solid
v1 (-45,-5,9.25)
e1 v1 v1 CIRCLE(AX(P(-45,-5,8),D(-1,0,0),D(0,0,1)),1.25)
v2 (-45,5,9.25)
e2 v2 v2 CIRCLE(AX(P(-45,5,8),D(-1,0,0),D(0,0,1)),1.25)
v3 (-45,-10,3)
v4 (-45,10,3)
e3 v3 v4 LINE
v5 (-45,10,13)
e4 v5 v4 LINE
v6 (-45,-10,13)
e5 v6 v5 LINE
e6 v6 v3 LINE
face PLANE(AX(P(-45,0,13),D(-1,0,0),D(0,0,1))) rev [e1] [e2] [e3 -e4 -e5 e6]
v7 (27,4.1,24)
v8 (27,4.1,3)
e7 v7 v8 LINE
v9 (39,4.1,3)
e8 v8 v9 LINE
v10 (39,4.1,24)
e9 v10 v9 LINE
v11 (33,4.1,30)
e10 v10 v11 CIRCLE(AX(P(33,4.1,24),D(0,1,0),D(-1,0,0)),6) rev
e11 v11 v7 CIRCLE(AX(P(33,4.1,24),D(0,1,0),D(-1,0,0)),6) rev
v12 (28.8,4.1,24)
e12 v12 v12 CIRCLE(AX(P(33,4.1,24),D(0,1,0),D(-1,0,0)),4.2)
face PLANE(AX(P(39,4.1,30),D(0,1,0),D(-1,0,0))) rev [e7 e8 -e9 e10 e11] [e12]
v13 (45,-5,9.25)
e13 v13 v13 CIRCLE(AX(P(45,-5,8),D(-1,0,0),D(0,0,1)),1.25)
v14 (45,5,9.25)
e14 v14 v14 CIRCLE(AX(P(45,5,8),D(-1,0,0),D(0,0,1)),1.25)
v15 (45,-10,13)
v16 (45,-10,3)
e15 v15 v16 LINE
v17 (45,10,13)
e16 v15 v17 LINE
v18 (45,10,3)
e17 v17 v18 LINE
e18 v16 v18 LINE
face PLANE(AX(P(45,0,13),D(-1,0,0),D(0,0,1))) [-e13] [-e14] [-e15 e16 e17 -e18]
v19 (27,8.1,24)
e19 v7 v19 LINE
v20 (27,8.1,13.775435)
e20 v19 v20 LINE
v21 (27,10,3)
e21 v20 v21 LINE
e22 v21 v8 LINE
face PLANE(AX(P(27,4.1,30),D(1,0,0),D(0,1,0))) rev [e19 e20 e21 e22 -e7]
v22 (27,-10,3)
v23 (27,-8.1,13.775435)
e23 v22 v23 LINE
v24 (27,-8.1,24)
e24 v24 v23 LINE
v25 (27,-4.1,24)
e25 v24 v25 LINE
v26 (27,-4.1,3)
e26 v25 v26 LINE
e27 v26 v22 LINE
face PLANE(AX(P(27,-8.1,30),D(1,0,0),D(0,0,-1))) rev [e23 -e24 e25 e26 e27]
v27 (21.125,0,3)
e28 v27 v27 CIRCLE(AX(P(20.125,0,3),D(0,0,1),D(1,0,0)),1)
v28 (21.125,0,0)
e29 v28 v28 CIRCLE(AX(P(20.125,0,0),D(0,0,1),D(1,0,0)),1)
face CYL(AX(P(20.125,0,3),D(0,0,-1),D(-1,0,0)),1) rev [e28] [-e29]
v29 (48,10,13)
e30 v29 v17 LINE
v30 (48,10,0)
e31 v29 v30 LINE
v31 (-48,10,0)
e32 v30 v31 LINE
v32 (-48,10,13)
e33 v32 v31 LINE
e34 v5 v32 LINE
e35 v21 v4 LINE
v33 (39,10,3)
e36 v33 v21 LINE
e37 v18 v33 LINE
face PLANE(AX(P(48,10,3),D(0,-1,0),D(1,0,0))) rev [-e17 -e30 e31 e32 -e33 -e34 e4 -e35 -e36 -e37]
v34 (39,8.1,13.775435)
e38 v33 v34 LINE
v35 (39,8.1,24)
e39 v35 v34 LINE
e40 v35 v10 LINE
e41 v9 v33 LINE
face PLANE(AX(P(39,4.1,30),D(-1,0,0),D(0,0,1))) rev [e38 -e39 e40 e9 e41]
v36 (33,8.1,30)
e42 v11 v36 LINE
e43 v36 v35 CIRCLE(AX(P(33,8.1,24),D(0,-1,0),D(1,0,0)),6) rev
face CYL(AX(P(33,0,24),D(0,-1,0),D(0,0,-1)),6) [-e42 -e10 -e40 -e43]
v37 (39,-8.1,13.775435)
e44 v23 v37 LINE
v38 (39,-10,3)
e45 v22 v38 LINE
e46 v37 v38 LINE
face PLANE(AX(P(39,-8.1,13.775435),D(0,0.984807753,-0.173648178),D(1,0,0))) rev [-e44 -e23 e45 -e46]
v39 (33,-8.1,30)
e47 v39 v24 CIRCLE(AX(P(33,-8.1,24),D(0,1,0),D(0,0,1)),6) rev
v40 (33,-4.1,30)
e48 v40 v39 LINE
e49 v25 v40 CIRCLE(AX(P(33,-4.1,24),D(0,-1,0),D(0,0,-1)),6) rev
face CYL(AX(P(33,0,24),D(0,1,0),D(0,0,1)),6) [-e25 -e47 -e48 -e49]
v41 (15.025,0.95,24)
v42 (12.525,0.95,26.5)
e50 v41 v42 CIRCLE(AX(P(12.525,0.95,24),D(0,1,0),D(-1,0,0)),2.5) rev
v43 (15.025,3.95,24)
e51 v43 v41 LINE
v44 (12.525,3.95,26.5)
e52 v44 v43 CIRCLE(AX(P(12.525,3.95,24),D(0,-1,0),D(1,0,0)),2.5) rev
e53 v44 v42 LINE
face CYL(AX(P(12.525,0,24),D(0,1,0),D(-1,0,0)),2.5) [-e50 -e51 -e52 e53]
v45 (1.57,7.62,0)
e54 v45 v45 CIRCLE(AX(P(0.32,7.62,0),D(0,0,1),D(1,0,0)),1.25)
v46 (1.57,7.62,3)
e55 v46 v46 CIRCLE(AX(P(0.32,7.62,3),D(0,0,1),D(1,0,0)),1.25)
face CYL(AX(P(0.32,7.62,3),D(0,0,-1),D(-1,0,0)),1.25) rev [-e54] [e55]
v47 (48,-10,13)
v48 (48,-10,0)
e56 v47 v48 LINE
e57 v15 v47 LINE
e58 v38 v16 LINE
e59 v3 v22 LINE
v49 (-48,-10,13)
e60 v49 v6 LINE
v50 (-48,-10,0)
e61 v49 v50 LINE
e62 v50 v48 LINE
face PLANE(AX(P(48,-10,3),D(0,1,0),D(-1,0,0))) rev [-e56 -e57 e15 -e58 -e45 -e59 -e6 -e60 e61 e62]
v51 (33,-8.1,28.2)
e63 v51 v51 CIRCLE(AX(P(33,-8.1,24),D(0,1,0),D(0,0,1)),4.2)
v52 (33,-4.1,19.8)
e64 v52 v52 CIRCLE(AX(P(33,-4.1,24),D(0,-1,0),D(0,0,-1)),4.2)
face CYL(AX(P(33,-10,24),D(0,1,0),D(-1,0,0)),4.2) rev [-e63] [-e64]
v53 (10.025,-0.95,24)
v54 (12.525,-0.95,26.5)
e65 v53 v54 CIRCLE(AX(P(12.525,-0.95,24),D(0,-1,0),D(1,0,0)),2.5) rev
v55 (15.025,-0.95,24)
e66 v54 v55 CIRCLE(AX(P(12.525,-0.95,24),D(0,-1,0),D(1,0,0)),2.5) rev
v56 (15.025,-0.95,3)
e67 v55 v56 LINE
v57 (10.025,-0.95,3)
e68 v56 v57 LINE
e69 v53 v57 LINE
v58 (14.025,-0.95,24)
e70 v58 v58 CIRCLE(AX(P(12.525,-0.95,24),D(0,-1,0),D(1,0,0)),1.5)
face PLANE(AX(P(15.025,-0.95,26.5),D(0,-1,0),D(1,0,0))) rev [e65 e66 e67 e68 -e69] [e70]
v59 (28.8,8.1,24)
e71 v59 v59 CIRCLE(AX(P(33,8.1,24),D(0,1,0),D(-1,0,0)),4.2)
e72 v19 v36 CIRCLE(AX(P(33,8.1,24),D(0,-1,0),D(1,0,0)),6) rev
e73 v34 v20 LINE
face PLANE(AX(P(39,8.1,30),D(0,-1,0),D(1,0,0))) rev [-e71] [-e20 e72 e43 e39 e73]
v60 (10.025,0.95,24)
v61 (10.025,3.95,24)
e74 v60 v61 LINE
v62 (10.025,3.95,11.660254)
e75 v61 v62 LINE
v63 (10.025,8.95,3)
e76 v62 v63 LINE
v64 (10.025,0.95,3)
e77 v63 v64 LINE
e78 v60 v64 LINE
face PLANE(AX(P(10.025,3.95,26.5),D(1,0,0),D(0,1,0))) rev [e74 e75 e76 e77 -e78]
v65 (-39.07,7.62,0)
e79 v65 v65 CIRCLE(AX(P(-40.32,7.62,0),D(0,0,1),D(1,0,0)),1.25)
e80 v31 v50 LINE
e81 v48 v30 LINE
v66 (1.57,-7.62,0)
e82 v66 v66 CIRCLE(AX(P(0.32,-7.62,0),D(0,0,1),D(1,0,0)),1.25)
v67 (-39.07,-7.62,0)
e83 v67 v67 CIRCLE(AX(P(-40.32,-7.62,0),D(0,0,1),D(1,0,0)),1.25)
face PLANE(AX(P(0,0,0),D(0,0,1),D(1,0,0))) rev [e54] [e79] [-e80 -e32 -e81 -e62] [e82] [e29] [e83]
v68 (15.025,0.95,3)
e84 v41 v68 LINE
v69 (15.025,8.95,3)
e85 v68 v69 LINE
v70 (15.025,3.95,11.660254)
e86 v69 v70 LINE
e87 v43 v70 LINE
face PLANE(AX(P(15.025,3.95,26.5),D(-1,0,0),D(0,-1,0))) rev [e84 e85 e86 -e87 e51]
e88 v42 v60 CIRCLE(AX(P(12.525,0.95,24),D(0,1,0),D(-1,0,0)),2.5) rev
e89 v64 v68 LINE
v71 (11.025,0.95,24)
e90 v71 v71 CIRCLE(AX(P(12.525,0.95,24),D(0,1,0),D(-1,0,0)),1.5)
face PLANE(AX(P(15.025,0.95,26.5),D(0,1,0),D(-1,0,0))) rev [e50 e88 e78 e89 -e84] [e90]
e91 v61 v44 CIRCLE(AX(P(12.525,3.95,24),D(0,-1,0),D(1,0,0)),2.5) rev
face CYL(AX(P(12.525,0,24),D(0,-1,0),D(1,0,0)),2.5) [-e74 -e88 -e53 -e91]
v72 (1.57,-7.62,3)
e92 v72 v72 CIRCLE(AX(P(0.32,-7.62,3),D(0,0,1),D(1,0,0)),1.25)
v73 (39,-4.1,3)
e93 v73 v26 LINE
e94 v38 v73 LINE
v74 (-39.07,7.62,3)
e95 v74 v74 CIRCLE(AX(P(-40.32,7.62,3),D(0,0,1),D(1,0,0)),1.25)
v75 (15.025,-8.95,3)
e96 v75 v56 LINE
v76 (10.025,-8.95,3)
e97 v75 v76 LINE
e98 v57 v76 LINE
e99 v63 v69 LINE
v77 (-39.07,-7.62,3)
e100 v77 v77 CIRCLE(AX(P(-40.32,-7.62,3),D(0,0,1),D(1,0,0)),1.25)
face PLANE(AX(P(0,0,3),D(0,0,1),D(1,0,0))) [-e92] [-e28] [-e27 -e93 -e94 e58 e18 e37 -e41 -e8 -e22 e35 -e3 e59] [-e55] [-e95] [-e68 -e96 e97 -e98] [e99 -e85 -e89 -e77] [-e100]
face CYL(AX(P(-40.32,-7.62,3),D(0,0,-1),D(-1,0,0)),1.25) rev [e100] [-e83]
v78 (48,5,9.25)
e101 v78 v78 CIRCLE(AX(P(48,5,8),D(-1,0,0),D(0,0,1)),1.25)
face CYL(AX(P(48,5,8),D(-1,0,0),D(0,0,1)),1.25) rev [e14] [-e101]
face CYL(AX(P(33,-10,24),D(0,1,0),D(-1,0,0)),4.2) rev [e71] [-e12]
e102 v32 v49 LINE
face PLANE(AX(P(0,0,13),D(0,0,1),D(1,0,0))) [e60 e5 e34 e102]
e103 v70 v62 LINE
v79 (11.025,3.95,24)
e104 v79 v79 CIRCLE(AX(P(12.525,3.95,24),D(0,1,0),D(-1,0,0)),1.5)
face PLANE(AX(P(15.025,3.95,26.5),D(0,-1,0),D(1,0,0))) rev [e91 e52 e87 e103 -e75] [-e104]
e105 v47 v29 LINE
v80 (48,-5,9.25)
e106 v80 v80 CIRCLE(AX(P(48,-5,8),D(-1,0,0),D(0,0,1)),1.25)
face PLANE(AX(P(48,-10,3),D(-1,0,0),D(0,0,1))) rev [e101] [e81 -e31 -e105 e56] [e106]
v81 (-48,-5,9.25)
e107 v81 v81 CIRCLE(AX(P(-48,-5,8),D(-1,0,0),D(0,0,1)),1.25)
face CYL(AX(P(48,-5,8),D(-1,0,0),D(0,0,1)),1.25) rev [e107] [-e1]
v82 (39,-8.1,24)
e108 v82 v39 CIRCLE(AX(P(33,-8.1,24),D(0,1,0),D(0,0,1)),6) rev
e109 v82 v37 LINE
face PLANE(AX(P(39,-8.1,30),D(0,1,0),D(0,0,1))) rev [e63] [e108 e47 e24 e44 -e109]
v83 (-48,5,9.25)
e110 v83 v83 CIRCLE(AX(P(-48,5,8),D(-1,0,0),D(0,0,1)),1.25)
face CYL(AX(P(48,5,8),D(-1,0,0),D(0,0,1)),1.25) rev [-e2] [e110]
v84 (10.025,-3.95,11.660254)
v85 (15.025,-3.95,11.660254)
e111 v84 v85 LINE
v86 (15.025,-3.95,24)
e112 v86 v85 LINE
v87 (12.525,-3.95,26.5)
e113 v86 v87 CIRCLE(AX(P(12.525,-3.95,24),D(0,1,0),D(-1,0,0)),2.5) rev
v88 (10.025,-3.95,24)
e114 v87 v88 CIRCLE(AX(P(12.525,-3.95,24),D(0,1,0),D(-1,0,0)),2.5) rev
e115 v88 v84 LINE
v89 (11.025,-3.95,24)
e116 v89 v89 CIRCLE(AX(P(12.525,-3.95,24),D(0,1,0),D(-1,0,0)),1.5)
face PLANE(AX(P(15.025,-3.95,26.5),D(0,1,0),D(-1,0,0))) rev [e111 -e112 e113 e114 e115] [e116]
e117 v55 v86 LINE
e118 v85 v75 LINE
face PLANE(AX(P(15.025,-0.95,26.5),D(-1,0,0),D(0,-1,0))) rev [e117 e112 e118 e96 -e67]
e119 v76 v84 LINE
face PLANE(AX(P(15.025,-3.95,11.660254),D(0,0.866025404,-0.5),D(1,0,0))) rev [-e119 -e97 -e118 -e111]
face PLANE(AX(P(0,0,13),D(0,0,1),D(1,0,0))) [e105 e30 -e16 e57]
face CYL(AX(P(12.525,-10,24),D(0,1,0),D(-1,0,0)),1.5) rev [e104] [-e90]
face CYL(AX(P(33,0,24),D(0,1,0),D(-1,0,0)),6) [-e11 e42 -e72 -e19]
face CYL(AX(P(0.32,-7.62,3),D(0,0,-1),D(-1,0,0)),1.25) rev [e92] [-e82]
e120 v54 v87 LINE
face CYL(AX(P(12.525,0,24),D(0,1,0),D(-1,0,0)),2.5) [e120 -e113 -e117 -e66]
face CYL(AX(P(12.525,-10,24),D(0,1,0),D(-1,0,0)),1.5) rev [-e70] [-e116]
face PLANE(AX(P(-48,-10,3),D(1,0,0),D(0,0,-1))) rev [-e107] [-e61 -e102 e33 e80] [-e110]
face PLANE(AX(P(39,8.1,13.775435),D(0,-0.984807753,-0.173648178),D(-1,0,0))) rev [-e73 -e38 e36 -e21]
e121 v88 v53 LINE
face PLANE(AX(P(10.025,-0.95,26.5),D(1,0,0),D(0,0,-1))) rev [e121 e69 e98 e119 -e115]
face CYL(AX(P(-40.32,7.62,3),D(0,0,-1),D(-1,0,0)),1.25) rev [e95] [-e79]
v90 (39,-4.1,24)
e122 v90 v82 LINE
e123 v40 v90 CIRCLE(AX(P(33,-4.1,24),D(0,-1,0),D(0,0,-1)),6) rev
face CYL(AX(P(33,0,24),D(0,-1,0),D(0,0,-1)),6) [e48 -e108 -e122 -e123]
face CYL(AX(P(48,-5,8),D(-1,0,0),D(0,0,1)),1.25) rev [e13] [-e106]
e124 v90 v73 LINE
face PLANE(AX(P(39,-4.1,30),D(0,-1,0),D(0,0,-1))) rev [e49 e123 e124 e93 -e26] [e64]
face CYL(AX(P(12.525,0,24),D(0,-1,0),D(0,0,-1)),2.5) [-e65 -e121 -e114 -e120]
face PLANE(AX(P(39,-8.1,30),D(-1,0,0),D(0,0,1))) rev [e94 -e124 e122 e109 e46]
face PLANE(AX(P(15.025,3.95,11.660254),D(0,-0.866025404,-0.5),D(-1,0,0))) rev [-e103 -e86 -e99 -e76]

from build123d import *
from OCP.BRepFilletAPI import BRepFilletAPI_MakeChamfer

# Parameters (mm, degrees)
SCHIZZO1_W                   = 96
SCHIZZO1_H                   = 20
SCHIZZO1_R                   = 1
SCHIZZO1_R_2                 = 1.25
ESTRUSIONE_ESTRUSIONE1_DEPTH = 3
SCHIZZO2_W                   = 3
SCHIZZO2_H                   = 20
ESTRUSIONE_ESTRUSIONE2_DEPTH = 10
SCHIZZO3_R                   = 1.25
TAGLIO_ESTRUSIONE1_DEPTH     = 98.390964673
SCHIZZO4_W                   = 12
SCHIZZO4_H                   = 4
ESTRUSIONE_ESTRUSIONE3_DEPTH = 27
RACCORDO1_R                  = 6
SCHIZZO5_R                   = 4.2
TAGLIO_ESTRUSIONE2_DEPTH     = 60.427350606
SMUSSO1_SIZE                 = 10.775435457
SMUSSO1_SIZE_2               = 1.9
SCHIZZO6_W                   = 5
SCHIZZO6_H                   = 3
ESTRUSIONE_ESTRUSIONE4_DEPTH = 23.5
RACCORDO2_R                  = 2.5
SCHIZZO7_R                   = 1.5
TAGLIO_ESTRUSIONE3_DEPTH     = 59.297534253
SMUSSO2_SIZE                 = 5
SMUSSO2_SIZE2                = 8.660254038


with BuildPart() as part:
    # Schizzo1 → Estrusione-Estrusione1 (new body)
    with BuildSketch(Plane.XY):
        Rectangle(SCHIZZO1_W, SCHIZZO1_H)
        with Locations((20.125, 0)):
            Circle(SCHIZZO1_R, mode=Mode.SUBTRACT)
        with Locations((-40.32, 7.62)):
            Circle(SCHIZZO1_R_2, mode=Mode.SUBTRACT)
        with Locations((0.32, 7.62)):
            Circle(SCHIZZO1_R_2, mode=Mode.SUBTRACT)
        with Locations((0.32, -7.62)):
            Circle(SCHIZZO1_R_2, mode=Mode.SUBTRACT)
        with Locations((-40.32, -7.62)):
            Circle(SCHIZZO1_R_2, mode=Mode.SUBTRACT)
    extrude(amount=ESTRUSIONE_ESTRUSIONE1_DEPTH)

    # Schizzo2 → Estrusione-Estrusione2 (add)
    with BuildSketch(Plane.XY.offset(3)):
        with Locations((-46.5, 0)):
            Rectangle(SCHIZZO2_W, SCHIZZO2_H)
        with Locations((46.5, 0)):
            Rectangle(SCHIZZO2_W, SCHIZZO2_H)
    extrude(amount=ESTRUSIONE_ESTRUSIONE2_DEPTH)

    # Schizzo3 → Taglio-Estrusione1 (cut, through all)
    with BuildSketch(Plane.ZY.offset(48)):
        with Locations((8, -5)):
            Circle(SCHIZZO3_R)
        with Locations((8, 5)):
            Circle(SCHIZZO3_R)
    extrude(amount=-TAGLIO_ESTRUSIONE1_DEPTH, mode=Mode.SUBTRACT)

    # Schizzo4 → Estrusione-Estrusione3 (add)
    with BuildSketch(Plane.XY.offset(3)):
        with Locations((33, -6.1)):
            Rectangle(SCHIZZO4_W, SCHIZZO4_H)
        with Locations((33, 6.1)):
            Rectangle(SCHIZZO4_W, SCHIZZO4_H)
    extrude(amount=ESTRUSIONE_ESTRUSIONE3_DEPTH)

    # Raccordo1
    raccordo1_edges = [part.edges().sort_by_distance(p)[0] for p in [
        (27, 6.1, 30),
        (39, 6.1, 30),
        (39, -6.1, 30),
        (27, -6.1, 30),
    ]]
    fillet(raccordo1_edges, radius=RACCORDO1_R - 0.0001)  # a hair under: the kernel refuses the full size

    # Schizzo5 → Taglio-Estrusione2 (cut, through all)
    with BuildSketch(Plane(origin=(0, 8.1, 0), x_dir=(1, 0, 0), z_dir=(0, 1, 0))):
        with Locations(Location((33, -24, 0), (0, 0, 180))):
            Circle(SCHIZZO5_R)
    extrude(amount=-TAGLIO_ESTRUSIONE2_DEPTH, mode=Mode.SUBTRACT)

    # Smusso1
    smusso1_edges_1 = [part.edges().sort_by_distance(p)[0] for p in [
        (33, -8.1, 3),
    ]]
    smusso1_side_1 = [part.faces().sort_by_distance(p)[0] for p in [
        (33, -8.1, 3.038),
    ]]
    smusso1_edges_2 = [part.edges().sort_by_distance(p)[0] for p in [
        (33, 8.1, 3),
    ]]
    smusso1_side_2 = [part.faces().sort_by_distance(p)[0] for p in [
        (33, 8.138, 3),
    ]]
    smusso1 = BRepFilletAPI_MakeChamfer(part.part.solid().wrapped)
    for e in smusso1_edges_1:
        smusso1.Add(SMUSSO1_SIZE - 0.0001, SMUSSO1_SIZE_2 - 0.0001, e.wrapped, smusso1_side_1[0].wrapped)
    for e in smusso1_edges_2:
        smusso1.Add(SMUSSO1_SIZE_2 - 0.0001, SMUSSO1_SIZE - 0.0001, e.wrapped, smusso1_side_2[0].wrapped)
    add(Compound.cast(smusso1.Shape()), mode=Mode.REPLACE)  # a hair under: the kernel refuses the full size

    # Schizzo6 → Estrusione-Estrusione4 (add)
    with BuildSketch(Plane.XY.offset(3)):
        with Locations((12.525, 2.45)):
            Rectangle(SCHIZZO6_W, SCHIZZO6_H)
        with Locations((12.525, -2.45)):
            Rectangle(SCHIZZO6_W, SCHIZZO6_H)
    extrude(amount=ESTRUSIONE_ESTRUSIONE4_DEPTH)

    # Raccordo2
    raccordo2_edges = [part.edges().sort_by_distance(p)[0] for p in [
        (15.025, -2.45, 26.5),
        (10.025, -2.45, 26.5),
        (15.025, 2.45, 26.5),
        (10.025, 2.45, 26.5),
    ]]
    fillet(raccordo2_edges, radius=RACCORDO2_R - 0.0001)  # a hair under: the kernel refuses the full size

    # Schizzo7 → Taglio-Estrusione3 (cut, through all)
    with BuildSketch(Plane(origin=(0, 3.95, 0), x_dir=(1, 0, 0), z_dir=(0, 1, 0))):
        with Locations(Location((12.525, -24, 0), (0, 0, 180))):
            Circle(SCHIZZO7_R)
    extrude(amount=-TAGLIO_ESTRUSIONE3_DEPTH, mode=Mode.SUBTRACT)

    # Smusso2
    smusso2_edges = [part.edges().sort_by_distance(p)[0] for p in [
        (12.525, 3.95, 3),
        (12.525, -3.95, 3),
    ]]
    smusso2_side = [part.faces().sort_by_distance(p)[0] for p in [
        (-2.939038544, 0, 3),
    ]]
    chamfer(smusso2_edges, length=SMUSSO2_SIZE, length2=SMUSSO2_SIZE2, reference=smusso2_side[0])


solid = part.part
